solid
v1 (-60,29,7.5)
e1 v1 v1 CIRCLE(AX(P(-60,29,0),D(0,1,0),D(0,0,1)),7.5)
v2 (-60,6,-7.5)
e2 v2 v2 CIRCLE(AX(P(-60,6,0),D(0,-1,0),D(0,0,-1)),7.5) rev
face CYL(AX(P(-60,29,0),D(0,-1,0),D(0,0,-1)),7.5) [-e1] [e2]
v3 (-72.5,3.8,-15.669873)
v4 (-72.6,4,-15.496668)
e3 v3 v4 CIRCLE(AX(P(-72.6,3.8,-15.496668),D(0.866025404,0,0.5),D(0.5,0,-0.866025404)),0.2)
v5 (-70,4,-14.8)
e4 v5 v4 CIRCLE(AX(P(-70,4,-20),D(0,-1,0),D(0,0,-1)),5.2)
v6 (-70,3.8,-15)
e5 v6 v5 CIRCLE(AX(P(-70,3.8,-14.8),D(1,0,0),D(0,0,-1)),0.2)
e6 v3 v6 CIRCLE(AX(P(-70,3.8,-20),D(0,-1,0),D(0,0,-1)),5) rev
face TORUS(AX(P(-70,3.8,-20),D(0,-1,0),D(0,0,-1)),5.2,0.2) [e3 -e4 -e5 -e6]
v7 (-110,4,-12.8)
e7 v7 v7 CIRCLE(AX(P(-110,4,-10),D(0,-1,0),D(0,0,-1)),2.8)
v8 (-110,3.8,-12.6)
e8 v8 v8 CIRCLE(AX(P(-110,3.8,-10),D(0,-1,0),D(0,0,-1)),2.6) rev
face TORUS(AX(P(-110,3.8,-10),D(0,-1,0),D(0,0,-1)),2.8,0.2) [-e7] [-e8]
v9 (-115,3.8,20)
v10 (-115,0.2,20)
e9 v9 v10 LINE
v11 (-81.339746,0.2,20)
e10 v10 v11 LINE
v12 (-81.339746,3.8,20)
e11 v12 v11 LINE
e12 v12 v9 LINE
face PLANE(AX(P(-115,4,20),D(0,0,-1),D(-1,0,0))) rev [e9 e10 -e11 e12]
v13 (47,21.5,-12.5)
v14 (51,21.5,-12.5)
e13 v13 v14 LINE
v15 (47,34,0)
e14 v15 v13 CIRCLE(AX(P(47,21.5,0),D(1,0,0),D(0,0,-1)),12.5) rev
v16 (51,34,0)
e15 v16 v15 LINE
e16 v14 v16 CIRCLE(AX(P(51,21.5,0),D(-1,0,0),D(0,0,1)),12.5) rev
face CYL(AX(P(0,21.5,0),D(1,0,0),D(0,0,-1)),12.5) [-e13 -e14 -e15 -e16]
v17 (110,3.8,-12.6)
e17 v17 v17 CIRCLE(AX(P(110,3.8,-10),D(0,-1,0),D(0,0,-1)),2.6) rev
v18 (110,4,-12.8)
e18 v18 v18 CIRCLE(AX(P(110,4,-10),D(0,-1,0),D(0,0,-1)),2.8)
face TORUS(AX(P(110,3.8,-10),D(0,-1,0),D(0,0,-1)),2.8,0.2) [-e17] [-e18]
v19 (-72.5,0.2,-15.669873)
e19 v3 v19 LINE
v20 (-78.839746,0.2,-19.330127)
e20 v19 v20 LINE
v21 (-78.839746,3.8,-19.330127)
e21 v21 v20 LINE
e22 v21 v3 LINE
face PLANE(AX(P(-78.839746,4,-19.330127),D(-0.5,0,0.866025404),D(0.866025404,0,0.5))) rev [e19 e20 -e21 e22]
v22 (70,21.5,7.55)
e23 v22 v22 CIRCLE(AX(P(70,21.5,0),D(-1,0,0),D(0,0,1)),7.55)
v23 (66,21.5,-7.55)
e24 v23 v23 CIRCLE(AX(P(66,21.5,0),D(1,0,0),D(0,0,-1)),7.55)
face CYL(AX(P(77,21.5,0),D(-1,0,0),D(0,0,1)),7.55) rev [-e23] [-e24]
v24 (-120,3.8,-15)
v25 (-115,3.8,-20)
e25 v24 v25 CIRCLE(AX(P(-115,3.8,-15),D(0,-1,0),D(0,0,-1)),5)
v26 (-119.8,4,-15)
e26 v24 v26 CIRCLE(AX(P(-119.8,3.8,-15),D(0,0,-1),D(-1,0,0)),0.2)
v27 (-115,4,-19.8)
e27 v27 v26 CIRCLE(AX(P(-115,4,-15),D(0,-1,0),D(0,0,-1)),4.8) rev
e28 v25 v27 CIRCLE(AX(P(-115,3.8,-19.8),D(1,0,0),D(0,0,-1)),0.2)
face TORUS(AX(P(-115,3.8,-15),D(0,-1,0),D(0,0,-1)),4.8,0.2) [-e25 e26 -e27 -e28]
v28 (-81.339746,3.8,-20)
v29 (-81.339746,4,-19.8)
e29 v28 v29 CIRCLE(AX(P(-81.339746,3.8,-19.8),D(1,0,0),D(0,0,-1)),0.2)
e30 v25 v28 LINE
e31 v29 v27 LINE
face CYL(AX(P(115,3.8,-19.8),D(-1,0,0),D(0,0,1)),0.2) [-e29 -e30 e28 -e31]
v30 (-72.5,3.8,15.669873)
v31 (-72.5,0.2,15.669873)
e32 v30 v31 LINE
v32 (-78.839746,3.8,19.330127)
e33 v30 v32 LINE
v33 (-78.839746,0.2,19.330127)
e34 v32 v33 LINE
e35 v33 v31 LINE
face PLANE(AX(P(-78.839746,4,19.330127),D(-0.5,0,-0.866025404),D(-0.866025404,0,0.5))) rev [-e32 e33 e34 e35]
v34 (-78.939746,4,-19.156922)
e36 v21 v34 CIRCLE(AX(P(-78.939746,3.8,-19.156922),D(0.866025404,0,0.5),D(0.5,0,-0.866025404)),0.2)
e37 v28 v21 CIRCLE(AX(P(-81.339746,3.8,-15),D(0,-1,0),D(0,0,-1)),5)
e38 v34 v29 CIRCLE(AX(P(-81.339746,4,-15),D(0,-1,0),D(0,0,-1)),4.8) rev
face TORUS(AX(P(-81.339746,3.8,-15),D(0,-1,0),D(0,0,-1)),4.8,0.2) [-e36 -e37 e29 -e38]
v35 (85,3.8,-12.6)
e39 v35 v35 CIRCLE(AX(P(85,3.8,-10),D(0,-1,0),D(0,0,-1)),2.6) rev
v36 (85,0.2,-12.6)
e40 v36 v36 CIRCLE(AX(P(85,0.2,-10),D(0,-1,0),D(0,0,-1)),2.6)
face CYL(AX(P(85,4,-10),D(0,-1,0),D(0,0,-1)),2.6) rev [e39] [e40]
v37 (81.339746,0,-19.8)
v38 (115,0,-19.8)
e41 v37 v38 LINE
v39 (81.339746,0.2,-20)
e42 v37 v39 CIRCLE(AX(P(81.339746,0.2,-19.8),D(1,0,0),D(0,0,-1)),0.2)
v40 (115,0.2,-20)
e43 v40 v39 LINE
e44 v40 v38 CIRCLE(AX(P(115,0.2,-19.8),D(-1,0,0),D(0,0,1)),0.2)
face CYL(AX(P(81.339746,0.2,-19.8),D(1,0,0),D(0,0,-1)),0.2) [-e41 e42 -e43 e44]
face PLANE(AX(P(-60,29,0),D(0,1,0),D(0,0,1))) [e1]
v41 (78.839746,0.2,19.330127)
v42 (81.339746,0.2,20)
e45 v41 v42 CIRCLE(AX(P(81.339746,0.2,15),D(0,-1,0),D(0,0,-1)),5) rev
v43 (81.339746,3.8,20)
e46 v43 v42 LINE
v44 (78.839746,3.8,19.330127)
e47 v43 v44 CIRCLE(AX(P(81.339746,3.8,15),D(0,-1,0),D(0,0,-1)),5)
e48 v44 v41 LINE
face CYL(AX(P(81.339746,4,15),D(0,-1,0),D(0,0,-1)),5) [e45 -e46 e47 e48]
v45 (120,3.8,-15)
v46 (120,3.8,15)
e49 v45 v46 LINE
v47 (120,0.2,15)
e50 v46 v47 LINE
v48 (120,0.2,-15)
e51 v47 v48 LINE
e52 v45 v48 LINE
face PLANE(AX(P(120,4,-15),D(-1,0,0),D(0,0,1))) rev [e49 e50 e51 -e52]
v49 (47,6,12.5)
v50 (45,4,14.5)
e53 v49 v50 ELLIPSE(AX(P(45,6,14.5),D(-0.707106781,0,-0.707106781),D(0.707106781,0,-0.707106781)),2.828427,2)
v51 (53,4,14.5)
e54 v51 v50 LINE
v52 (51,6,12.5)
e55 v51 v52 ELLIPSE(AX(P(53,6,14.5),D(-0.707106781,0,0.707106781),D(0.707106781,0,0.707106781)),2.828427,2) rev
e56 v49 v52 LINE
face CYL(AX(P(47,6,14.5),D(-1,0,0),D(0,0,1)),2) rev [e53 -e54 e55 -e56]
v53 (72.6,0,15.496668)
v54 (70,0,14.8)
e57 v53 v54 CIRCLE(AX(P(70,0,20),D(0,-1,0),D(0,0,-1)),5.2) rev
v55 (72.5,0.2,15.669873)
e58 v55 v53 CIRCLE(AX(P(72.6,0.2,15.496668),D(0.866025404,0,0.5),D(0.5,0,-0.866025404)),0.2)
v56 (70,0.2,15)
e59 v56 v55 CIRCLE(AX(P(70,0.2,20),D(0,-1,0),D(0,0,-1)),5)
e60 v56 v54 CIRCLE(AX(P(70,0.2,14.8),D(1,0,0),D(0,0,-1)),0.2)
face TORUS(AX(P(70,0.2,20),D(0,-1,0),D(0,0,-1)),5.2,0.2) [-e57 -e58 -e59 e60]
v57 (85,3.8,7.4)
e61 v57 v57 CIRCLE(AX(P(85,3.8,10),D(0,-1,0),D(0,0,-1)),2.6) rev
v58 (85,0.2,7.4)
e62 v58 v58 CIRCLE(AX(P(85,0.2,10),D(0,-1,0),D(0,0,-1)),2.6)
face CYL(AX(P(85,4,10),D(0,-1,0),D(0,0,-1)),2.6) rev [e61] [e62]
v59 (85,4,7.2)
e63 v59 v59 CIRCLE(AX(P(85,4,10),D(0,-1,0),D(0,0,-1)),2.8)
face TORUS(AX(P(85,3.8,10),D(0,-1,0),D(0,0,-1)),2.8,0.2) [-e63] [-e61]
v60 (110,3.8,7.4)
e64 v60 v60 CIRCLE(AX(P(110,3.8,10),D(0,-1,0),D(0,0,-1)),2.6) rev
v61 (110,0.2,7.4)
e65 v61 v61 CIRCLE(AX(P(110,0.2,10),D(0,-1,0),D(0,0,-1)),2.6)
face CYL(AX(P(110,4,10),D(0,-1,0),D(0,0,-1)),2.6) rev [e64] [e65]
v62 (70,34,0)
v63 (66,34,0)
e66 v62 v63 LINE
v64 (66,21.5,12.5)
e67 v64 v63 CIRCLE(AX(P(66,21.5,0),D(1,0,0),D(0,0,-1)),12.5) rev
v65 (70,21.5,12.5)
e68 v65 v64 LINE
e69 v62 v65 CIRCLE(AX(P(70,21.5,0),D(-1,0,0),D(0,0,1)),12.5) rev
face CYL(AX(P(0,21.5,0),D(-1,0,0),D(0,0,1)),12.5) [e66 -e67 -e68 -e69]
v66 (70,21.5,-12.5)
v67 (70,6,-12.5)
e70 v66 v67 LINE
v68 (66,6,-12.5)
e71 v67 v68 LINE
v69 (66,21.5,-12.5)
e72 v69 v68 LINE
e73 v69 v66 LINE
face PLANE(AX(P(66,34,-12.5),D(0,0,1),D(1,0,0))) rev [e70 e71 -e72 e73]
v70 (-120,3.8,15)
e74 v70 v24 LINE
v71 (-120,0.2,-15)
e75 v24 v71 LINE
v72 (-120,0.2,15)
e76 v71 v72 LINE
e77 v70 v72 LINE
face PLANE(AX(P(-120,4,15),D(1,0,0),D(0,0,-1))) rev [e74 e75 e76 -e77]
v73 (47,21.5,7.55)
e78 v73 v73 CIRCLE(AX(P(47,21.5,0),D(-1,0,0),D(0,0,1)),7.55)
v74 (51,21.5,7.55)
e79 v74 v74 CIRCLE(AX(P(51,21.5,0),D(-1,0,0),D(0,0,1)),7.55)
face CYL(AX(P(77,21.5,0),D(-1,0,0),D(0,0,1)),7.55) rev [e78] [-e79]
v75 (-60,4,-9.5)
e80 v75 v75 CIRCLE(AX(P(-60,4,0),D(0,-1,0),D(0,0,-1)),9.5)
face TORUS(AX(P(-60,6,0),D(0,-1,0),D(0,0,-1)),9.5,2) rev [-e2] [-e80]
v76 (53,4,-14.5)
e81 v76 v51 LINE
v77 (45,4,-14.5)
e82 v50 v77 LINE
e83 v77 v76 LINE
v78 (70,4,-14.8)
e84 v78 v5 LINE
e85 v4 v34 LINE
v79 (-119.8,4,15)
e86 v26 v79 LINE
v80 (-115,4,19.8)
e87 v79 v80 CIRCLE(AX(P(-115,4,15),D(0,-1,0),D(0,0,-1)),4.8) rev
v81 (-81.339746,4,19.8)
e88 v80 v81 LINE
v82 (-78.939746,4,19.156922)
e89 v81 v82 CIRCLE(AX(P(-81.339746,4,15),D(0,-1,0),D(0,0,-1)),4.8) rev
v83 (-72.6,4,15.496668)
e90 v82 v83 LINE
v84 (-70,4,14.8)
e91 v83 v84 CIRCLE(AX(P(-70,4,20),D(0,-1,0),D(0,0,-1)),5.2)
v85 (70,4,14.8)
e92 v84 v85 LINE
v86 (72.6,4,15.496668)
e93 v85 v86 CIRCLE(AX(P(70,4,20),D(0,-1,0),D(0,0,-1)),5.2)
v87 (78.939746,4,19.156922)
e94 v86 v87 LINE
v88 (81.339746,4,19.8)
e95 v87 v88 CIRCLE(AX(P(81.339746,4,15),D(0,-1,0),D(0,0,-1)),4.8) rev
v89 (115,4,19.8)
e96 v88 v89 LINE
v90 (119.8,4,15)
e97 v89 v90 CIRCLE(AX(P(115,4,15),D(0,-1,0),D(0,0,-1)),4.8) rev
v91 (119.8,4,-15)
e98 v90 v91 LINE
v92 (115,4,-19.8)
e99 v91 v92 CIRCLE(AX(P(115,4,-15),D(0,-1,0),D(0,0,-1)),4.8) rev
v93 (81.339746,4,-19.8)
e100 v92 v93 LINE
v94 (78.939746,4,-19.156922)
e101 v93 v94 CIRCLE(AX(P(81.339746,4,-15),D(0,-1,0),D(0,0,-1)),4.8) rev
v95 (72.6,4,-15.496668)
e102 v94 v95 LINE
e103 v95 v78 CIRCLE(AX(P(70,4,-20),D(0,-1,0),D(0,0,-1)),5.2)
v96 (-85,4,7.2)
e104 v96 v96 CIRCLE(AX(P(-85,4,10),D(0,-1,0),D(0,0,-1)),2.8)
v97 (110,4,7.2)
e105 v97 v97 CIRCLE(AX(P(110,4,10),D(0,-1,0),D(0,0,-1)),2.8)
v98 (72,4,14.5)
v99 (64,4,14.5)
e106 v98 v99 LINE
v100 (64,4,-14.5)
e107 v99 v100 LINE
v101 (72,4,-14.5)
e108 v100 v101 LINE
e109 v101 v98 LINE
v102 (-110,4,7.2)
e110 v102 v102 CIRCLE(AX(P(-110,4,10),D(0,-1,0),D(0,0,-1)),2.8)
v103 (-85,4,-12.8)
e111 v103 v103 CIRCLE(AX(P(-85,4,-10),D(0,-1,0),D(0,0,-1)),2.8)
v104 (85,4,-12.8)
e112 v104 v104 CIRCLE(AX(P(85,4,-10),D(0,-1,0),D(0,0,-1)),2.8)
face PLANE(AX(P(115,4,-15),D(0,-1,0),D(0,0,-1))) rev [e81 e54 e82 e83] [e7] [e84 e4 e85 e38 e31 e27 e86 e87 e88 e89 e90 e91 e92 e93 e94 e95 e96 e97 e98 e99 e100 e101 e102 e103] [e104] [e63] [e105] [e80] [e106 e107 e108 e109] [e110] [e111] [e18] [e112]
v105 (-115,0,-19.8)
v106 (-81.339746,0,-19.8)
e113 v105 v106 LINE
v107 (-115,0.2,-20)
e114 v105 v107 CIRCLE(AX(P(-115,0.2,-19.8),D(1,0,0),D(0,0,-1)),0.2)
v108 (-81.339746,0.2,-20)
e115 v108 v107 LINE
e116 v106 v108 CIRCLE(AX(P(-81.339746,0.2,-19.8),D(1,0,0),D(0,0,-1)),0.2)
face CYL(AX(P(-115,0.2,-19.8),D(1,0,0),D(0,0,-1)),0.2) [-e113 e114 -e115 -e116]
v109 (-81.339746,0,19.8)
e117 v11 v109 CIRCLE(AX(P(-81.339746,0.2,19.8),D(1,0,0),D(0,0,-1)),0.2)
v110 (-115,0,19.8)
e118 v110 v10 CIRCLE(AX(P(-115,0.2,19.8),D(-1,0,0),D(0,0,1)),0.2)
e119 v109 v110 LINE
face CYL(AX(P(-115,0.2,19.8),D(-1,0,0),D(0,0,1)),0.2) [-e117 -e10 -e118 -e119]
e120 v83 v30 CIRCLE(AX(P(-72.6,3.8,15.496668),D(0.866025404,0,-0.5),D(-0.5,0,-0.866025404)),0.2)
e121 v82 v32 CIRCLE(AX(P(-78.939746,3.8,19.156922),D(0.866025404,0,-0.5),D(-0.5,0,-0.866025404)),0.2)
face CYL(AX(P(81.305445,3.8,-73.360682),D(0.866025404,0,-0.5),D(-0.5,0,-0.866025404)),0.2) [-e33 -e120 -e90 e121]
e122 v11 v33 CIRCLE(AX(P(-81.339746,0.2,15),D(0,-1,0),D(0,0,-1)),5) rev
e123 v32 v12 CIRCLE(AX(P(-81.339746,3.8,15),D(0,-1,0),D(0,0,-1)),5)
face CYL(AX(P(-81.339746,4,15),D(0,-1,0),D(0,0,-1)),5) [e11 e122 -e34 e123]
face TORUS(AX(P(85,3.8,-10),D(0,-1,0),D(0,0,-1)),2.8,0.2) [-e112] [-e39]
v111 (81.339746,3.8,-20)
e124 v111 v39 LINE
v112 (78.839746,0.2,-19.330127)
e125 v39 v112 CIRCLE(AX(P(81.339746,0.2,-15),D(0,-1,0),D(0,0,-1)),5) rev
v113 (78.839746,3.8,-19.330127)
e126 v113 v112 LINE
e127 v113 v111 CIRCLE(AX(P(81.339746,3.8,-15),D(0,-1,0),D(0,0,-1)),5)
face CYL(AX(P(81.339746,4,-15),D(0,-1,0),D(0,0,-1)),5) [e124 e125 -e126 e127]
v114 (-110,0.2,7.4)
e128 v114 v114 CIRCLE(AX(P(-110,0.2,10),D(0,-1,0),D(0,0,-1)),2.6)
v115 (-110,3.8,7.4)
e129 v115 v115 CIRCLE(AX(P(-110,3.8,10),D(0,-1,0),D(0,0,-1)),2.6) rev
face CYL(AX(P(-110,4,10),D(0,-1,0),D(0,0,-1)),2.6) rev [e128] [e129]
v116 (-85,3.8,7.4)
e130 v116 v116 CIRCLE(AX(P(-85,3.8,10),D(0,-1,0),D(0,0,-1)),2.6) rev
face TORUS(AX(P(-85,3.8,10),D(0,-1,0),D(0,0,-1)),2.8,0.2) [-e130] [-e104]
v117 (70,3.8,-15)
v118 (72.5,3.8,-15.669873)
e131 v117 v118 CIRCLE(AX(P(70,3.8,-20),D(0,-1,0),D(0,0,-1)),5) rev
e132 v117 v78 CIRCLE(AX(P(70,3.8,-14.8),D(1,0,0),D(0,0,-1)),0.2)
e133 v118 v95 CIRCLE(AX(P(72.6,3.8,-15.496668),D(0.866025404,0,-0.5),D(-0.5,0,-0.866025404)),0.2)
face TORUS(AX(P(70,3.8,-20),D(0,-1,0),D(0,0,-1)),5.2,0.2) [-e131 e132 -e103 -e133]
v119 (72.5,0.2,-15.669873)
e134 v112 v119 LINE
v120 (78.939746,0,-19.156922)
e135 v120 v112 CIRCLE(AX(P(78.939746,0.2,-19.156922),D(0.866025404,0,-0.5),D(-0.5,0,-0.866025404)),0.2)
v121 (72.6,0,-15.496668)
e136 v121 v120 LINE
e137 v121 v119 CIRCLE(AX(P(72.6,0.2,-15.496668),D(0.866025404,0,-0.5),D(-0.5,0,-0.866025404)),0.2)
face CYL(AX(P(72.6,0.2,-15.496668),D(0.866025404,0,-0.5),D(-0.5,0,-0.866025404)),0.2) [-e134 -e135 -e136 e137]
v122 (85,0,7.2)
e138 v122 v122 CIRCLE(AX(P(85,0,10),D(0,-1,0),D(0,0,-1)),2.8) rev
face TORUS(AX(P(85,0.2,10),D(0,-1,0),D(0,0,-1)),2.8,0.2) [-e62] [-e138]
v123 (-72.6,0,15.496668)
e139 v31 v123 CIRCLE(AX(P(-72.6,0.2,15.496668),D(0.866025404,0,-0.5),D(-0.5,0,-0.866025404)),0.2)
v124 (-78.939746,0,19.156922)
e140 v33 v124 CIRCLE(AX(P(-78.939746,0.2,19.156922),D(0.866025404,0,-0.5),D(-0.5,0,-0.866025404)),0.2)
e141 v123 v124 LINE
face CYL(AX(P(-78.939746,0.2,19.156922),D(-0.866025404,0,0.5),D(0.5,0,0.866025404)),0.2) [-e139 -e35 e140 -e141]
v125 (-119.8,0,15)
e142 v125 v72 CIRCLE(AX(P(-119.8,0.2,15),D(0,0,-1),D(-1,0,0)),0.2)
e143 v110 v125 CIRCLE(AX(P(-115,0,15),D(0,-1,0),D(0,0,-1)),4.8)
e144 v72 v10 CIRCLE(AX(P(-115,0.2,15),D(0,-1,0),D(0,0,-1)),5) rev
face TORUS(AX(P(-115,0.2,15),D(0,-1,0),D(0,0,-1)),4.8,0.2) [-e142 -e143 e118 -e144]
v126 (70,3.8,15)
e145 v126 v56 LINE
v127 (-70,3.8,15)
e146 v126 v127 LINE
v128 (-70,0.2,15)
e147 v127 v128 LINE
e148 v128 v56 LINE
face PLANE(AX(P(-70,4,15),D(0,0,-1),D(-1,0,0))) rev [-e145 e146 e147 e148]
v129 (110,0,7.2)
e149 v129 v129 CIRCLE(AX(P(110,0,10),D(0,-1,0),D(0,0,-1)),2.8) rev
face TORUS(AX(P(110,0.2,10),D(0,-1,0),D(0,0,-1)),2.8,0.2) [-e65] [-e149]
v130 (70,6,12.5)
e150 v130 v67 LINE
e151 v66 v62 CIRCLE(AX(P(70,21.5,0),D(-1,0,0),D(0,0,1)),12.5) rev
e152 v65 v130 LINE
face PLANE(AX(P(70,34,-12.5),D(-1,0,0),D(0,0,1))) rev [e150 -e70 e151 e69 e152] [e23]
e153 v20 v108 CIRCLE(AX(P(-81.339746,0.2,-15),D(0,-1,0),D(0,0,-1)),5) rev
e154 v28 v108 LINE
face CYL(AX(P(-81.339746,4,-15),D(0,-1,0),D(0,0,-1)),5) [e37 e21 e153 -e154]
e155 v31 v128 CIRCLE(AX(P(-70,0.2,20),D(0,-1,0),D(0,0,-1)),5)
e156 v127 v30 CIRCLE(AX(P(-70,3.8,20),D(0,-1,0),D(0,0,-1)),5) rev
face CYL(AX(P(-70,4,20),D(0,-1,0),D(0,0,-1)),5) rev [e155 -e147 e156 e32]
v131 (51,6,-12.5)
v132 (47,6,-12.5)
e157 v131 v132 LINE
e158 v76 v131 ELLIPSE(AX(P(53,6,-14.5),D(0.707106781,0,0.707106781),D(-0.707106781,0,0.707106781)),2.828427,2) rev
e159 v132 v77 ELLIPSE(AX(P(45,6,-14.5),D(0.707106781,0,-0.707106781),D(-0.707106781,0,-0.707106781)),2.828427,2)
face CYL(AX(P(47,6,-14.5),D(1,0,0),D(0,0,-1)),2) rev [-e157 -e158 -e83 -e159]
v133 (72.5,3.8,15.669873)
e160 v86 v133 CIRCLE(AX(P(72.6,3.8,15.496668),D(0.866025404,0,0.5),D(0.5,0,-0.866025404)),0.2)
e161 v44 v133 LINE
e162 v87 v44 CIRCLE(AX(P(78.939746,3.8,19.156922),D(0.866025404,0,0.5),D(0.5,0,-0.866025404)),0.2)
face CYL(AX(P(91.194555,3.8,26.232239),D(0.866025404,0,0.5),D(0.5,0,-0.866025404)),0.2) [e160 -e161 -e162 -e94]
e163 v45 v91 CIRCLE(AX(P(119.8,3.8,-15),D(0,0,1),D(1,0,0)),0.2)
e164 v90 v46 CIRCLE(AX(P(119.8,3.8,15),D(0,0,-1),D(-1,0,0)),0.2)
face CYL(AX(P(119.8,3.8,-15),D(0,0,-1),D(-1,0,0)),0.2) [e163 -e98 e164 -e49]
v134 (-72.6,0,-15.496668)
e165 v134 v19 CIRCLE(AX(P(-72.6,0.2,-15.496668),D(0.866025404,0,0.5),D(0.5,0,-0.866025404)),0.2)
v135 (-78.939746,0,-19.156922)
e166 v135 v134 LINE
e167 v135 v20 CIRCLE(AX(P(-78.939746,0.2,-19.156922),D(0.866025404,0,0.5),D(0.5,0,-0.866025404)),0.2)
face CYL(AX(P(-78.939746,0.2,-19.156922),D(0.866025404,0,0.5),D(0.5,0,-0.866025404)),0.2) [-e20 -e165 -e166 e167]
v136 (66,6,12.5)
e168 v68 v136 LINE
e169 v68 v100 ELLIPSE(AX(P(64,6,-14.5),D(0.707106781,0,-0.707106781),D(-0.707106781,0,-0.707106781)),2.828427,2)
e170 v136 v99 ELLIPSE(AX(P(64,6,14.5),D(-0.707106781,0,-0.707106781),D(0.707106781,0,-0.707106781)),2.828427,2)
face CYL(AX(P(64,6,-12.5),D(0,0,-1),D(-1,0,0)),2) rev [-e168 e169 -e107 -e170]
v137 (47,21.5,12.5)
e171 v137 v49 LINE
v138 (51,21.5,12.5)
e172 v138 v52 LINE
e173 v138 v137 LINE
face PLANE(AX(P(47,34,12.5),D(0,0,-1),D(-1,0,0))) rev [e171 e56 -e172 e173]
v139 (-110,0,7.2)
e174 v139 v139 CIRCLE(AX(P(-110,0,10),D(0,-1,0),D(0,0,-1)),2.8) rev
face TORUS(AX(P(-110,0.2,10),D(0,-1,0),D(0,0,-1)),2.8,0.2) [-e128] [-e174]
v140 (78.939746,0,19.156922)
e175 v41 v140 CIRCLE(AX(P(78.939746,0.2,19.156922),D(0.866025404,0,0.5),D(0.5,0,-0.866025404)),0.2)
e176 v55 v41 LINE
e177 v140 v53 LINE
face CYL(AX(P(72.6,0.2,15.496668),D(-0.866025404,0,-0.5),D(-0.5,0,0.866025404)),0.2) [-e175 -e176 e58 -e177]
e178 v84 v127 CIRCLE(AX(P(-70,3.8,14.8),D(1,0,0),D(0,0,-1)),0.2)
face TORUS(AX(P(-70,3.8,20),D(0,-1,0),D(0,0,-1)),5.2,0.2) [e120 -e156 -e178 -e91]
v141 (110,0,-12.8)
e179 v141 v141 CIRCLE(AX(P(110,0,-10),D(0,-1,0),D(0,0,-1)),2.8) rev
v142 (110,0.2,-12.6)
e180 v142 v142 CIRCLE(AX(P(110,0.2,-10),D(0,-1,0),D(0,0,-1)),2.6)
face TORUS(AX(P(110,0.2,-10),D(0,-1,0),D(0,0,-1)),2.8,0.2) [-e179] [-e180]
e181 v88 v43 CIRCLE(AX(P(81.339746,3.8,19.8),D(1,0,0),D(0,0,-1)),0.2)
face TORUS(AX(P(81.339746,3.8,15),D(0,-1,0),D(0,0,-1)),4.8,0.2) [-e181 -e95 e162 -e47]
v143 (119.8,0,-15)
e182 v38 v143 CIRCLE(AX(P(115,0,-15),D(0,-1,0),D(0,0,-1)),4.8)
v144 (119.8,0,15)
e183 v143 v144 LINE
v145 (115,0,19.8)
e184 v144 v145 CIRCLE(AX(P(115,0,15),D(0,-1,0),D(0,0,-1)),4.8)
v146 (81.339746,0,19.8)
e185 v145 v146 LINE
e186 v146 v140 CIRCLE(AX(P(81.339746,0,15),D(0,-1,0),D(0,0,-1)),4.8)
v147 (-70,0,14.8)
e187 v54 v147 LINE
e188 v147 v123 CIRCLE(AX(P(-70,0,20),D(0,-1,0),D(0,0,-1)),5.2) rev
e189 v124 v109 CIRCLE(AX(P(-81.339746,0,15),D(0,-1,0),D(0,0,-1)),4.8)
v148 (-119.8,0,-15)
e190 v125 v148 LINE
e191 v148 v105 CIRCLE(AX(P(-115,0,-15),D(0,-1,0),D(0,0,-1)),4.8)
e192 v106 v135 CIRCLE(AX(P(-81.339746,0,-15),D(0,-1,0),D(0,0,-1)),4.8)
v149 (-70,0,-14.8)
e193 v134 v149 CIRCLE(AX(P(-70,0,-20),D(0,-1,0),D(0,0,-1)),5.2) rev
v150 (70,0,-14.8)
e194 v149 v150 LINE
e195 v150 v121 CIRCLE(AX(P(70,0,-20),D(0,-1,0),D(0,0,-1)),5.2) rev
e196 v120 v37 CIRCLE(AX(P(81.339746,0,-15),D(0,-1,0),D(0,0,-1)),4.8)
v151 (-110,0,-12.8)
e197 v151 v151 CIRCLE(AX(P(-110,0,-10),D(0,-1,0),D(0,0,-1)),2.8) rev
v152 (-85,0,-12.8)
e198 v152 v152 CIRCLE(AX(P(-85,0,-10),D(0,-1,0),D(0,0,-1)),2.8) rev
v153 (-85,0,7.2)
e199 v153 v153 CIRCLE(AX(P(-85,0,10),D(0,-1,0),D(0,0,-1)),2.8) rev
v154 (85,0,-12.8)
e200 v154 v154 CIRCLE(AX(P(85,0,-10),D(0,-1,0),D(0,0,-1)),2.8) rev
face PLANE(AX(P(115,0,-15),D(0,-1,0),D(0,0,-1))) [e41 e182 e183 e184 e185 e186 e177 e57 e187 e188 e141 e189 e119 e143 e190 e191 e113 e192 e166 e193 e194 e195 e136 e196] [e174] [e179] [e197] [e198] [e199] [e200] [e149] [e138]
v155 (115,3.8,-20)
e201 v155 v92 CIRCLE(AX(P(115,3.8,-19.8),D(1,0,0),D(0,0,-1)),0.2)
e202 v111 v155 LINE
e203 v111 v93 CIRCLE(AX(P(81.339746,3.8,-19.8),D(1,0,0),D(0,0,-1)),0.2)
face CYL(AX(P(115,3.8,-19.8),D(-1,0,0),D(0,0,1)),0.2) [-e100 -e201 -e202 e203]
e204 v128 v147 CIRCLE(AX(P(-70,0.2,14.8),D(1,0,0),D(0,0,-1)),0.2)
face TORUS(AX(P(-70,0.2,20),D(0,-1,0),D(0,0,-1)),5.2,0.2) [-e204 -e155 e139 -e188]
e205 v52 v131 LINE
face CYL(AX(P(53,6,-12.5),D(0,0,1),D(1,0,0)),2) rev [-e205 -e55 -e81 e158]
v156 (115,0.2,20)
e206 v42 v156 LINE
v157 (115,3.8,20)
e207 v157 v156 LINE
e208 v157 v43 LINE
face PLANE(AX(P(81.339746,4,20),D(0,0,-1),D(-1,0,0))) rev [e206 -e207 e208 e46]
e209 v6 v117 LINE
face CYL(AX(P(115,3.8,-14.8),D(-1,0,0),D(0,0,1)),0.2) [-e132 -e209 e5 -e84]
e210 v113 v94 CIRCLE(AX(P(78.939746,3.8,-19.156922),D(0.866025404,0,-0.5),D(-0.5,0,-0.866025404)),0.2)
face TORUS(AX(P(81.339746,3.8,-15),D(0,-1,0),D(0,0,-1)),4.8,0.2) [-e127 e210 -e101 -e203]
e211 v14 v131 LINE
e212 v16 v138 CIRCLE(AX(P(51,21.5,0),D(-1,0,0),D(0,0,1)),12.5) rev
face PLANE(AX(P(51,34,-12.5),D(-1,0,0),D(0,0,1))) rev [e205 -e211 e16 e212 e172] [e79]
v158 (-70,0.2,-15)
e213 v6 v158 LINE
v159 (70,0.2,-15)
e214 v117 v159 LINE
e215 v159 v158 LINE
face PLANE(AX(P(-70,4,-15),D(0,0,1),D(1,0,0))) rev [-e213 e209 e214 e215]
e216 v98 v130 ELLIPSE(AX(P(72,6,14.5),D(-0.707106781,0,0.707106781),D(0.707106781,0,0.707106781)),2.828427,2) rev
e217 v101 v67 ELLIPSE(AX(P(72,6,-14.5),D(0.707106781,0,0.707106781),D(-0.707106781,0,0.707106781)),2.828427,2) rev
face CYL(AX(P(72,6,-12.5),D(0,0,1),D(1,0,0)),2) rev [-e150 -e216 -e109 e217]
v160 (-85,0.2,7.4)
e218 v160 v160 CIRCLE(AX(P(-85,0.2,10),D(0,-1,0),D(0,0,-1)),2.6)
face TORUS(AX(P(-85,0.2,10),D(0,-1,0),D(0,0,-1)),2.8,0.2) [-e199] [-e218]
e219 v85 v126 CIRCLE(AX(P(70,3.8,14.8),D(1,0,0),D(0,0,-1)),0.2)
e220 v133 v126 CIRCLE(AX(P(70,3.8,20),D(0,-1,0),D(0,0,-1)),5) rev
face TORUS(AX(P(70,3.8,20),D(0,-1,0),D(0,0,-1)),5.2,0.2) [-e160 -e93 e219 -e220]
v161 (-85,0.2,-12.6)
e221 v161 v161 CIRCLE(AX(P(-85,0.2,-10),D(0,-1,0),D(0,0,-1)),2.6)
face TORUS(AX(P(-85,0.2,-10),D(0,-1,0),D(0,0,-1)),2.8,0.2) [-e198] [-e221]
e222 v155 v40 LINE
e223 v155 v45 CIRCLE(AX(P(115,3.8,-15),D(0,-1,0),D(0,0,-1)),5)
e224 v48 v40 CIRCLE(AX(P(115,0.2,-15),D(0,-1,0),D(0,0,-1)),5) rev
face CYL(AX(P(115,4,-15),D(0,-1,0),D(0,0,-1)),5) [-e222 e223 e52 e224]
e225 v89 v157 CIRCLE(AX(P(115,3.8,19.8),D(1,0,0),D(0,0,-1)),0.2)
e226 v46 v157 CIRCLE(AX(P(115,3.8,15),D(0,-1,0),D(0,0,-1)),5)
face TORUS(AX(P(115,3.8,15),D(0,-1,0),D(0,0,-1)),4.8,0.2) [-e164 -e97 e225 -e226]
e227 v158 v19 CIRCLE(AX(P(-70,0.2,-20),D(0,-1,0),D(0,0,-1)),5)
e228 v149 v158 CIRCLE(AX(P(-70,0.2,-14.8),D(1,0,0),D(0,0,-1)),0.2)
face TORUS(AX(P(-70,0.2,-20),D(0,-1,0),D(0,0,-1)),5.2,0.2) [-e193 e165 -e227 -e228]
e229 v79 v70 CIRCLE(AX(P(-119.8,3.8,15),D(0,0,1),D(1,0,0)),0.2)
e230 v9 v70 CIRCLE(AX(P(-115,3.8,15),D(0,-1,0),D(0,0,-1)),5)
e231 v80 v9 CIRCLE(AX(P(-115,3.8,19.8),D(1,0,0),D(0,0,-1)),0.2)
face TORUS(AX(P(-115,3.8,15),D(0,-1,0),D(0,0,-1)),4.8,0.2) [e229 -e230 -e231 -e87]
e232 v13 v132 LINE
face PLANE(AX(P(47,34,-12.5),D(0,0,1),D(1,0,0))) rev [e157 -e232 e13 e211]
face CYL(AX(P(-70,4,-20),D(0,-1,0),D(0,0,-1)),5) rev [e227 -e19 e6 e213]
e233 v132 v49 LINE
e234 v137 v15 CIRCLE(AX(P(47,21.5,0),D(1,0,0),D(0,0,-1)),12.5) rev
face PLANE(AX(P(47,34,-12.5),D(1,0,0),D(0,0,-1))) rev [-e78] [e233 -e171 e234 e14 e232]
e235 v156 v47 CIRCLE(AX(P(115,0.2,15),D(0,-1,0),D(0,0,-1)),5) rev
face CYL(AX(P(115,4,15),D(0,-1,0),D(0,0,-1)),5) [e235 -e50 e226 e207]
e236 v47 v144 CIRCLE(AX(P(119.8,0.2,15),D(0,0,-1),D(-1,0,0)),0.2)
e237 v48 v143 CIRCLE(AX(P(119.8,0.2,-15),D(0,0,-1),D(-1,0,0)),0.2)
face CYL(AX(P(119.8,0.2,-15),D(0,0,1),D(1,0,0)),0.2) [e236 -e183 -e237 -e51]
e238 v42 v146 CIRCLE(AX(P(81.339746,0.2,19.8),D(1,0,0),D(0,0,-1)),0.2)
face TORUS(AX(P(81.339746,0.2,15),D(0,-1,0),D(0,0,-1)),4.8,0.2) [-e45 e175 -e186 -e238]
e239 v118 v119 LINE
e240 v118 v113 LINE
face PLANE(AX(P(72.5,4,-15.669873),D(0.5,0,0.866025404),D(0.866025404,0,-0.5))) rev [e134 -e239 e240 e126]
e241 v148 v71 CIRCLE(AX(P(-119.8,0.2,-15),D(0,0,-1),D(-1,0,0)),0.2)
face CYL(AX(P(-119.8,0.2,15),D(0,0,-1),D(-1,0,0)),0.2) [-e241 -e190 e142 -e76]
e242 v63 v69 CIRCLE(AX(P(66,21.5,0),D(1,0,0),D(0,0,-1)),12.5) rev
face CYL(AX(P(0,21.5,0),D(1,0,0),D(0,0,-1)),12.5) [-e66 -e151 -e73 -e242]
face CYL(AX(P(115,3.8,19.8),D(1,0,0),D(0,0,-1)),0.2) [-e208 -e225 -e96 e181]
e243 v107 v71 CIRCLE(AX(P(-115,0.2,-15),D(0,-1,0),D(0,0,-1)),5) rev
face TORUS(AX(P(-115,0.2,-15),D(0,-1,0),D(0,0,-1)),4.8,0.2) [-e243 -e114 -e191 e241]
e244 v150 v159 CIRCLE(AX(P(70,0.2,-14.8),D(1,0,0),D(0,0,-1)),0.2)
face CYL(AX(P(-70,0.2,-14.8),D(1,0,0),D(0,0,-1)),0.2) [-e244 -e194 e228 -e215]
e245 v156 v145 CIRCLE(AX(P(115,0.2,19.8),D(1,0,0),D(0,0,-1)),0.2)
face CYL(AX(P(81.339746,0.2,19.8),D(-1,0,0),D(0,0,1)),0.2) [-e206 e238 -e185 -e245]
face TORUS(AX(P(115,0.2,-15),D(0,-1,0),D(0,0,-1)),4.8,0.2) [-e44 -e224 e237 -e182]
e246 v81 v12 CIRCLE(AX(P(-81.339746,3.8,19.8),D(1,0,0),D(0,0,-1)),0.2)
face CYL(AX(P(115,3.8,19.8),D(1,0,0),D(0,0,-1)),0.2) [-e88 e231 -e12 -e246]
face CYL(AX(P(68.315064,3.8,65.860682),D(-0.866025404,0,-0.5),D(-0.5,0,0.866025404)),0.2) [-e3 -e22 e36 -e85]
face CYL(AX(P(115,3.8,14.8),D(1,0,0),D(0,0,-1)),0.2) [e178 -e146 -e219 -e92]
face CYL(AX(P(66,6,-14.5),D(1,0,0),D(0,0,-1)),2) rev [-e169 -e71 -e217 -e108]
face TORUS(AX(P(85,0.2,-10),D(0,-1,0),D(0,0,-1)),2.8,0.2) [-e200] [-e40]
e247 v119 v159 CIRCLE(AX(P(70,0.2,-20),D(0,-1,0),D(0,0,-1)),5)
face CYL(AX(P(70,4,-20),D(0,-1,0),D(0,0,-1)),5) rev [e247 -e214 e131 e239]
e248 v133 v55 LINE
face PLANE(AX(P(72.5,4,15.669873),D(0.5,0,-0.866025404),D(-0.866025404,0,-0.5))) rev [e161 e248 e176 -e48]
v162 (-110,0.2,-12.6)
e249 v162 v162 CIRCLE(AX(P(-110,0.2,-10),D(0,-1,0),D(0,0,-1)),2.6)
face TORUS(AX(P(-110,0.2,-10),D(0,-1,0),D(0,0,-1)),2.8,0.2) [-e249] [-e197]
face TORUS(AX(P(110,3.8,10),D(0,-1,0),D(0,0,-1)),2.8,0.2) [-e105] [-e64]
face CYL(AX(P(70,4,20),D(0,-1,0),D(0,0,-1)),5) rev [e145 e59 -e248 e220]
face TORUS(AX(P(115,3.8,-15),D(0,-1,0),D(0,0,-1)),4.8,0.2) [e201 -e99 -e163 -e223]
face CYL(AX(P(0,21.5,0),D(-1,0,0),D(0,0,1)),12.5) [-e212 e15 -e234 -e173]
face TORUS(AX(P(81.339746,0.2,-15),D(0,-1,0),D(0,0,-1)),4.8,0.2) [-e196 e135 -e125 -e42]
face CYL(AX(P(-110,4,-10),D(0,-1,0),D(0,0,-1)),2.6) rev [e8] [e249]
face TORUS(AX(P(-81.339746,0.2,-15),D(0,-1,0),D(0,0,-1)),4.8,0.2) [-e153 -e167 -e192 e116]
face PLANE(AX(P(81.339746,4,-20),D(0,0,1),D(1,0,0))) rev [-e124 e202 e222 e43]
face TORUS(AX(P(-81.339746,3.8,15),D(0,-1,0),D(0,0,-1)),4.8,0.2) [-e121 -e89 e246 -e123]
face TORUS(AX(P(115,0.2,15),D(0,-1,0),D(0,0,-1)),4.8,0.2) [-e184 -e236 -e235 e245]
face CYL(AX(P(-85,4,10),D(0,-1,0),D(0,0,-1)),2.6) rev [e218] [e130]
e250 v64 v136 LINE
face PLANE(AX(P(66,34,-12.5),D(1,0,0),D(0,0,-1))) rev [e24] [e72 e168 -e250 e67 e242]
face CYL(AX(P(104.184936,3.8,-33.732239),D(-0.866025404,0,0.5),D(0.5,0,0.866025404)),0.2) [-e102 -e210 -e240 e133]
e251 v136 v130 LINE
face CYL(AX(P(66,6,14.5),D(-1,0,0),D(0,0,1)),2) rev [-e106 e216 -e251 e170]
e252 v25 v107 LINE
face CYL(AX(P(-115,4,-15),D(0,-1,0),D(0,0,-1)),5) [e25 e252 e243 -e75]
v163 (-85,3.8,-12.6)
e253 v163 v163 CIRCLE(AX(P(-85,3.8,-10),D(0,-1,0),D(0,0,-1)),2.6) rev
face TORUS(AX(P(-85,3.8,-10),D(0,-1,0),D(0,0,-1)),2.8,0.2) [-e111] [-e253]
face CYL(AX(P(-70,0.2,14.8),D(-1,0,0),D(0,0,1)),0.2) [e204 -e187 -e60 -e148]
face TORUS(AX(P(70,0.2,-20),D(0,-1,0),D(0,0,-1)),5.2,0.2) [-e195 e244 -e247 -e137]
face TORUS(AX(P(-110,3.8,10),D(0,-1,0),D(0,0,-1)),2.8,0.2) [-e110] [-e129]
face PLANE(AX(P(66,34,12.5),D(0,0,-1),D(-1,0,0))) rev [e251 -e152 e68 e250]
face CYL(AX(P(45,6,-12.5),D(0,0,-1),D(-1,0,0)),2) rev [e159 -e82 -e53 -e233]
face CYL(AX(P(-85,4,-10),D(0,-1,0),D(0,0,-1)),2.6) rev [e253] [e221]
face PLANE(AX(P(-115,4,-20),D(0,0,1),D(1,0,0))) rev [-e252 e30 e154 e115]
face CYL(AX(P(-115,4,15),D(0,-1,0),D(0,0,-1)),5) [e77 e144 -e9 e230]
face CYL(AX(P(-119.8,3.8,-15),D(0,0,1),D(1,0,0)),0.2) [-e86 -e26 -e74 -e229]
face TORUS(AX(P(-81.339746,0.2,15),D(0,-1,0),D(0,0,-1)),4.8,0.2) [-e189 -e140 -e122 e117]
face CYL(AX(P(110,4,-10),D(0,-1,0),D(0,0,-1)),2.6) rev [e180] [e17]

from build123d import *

# Parameters (mm, degrees)
SKETCH1_R           = 2.6
BOSS_EXTRUDE1_DEPTH = 4
SKETCH2_W           = 4
SKETCH2_H           = 25
BOSS_EXTRUDE2_DEPTH = 30
FILLET2_R           = 12.5
SKETCH4_R           = 7.55
CUT_EXTRUDE1_DEPTH  = 30
SKETCH5_R           = 7.5
BOSS_EXTRUDE3_DEPTH = 25
FILLET3_R           = 2
FILLET6_R           = 0.2


with BuildPart() as part:
    # Sketch1 → Boss-Extrude1 (new body)
    with BuildSketch(Plane(origin=(0, 0, 0), x_dir=(1, 0, 0), z_dir=(0, 1, 0))):
        with BuildLine():
            Line((-120, -15), (-120, 15))
            ThreePointArc((-120, 15), (-118.535533906, 18.535533906), (-115, 20))
            Line((-115, 20), (-81.339745962, 20))
            ThreePointArc((-81.339745962, 20), (-80.045650737, 19.829629131), (-78.839745962, 19.330127019))
            Line((-78.839745962, 19.330127019), (-72.5, 15.669872981))
            ThreePointArc((-72.5, 15.669872981), (-71.294095226, 15.170370869), (-70, 15))
            Line((-70, 15), (70, 15))
            ThreePointArc((70, 15), (71.294095226, 15.170370869), (72.5, 15.669872981))
            Line((72.5, 15.669872981), (78.839745962, 19.330127019))
            ThreePointArc((78.839745962, 19.330127019), (80.045650737, 19.829629131), (81.339745962, 20))
            Line((81.339745962, 20), (115, 20))
            ThreePointArc((115, 20), (118.535533906, 18.535533906), (120, 15))
            Line((120, 15), (120, -15))
            ThreePointArc((120, -15), (118.535533906, -18.535533906), (115, -20))
            Line((115, -20), (81.339745962, -20))
            ThreePointArc((81.339745962, -20), (80.045650737, -19.829629131), (78.839745962, -19.330127019))
            Line((78.839745962, -19.330127019), (72.5, -15.669872981))
            ThreePointArc((72.5, -15.669872981), (71.294095226, -15.170370869), (70, -15))
            Line((70, -15), (-70, -15))
            ThreePointArc((-70, -15), (-71.294095226, -15.170370869), (-72.5, -15.669872981))
            Line((-72.5, -15.669872981), (-78.839745962, -19.330127019))
            ThreePointArc((-78.839745962, -19.330127019), (-80.045650737, -19.829629131), (-81.339745962, -20))
            Line((-81.339745962, -20), (-115, -20))
            ThreePointArc((-115, -20), (-118.535533906, -18.535533906), (-120, -15))
        make_face()
        with Locations(Location((-110, 10, 0), (0, 0, 270))):
            Circle(SKETCH1_R, mode=Mode.SUBTRACT)
        with Locations(Location((-85, 10, 0), (0, 0, 270))):
            Circle(SKETCH1_R, mode=Mode.SUBTRACT)
        with Locations(Location((-85, -10, 0), (0, 0, 270))):
            Circle(SKETCH1_R, mode=Mode.SUBTRACT)
        with Locations(Location((-110, -10, 0), (0, 0, 270))):
            Circle(SKETCH1_R, mode=Mode.SUBTRACT)
        with Locations(Location((85, -10, 0), (0, 0, 90))):
            Circle(SKETCH1_R, mode=Mode.SUBTRACT)
        with Locations(Location((110, -10, 0), (0, 0, 90))):
            Circle(SKETCH1_R, mode=Mode.SUBTRACT)
        with Locations(Location((85, 10, 0), (0, 0, 90))):
            Circle(SKETCH1_R, mode=Mode.SUBTRACT)
        with Locations(Location((110, 10, 0), (0, 0, 90))):
            Circle(SKETCH1_R, mode=Mode.SUBTRACT)
    extrude(amount=BOSS_EXTRUDE1_DEPTH)

    # Sketch2 → Boss-Extrude2 (add)
    with BuildSketch(Plane(origin=(0, 4, 0), x_dir=(1, 0, 0), z_dir=(0, 1, 0))):
        with Locations((49, 0)):
            Rectangle(SKETCH2_W, SKETCH2_H)
        with Locations((68, 0)):
            Rectangle(SKETCH2_W, SKETCH2_H)
    extrude(amount=BOSS_EXTRUDE2_DEPTH)

    # Fillet2
    fillet2_edges = [part.edges().sort_by_distance(p)[0] for p in [
        (49, 34, 12.5),
        (68, 34, 12.5),
        (68, 34, -12.5),
        (49, 34, -12.5),
    ]]
    fillet(fillet2_edges, radius=FILLET2_R - 0.0001)  # a hair under: the kernel refuses the full size

    # Sketch4 → Cut-Extrude1 (cut)
    with BuildSketch(Plane.ZY.offset(-47)):
        with Locations((0, 21.5)):
            Circle(SKETCH4_R)
    extrude(amount=-CUT_EXTRUDE1_DEPTH, mode=Mode.SUBTRACT)

    # Sketch5 → Boss-Extrude3 (add)
    with BuildSketch(Plane(origin=(0, 4, 0), x_dir=(1, 0, 0), z_dir=(0, 1, 0))):
        with Locations(Location((-60, 0, 0), (0, 0, 90))):
            Circle(SKETCH5_R)
    extrude(amount=BOSS_EXTRUDE3_DEPTH)

    # Fillet3
    fillet3_edges = [part.edges().sort_by_distance(p)[0] for p in [
        (51, 4, 0),
        (49, 4, -12.5),
        (47, 4, 0),
        (49, 4, 12.5),
        (70, 4, 0),
        (68, 4, -12.5),
        (66, 4, 0),
        (68, 4, 12.5),
        (-60, 4, 7.5),
    ]]
    fillet(fillet3_edges, radius=FILLET3_R)

    # Fillet6
    fillet6_edges = [part.edges().sort_by_distance(p)[0] for p in [
        (80.045650737, 4, -19.829629131),
        (75.669872981, 4, -17.5),
        (71.294095226, 4, -15.170370869),
        (120, 0, 0),
        (118.535533906, 0, 18.535533906),
        (98.169872981, 0, 20),
        (80.045650737, 0, 19.829629131),
        (75.669872981, 0, 17.5),
        (0, 4, -15),
        (71.294095226, 0, 15.170370869),
        (0, 0, 15),
        (-71.294095226, 0, 15.170370869),
        (-75.669872981, 0, 17.5),
        (-80.045650737, 0, 19.829629131),
        (-98.169872981, 0, 20),
        (-118.535533906, 0, 18.535533906),
        (-120, 0, 0),
        (-118.535533906, 0, -18.535533906),
        (-98.169872981, 0, -20),
        (-71.294095226, 4, -15.170370869),
        (-80.045650737, 0, -19.829629131),
        (-75.669872981, 0, -17.5),
        (-71.294095226, 0, -15.170370869),
        (0, 0, -15),
        (71.294095226, 0, -15.170370869),
        (75.669872981, 0, -17.5),
        (80.045650737, 0, -19.829629131),
        (98.169872981, 0, -20),
        (118.535533906, 0, -18.535533906),
        (-75.669872981, 4, -17.5),
        (-80.045650737, 4, -19.829629131),
        (-98.169872981, 4, -20),
        (-118.535533906, 4, -18.535533906),
        (-120, 4, 0),
        (118.535533906, 4, -18.535533906),
        (-118.535533906, 4, 18.535533906),
        (-98.169872981, 4, 20),
        (-110, 0, -12.6),
        (-110, 4, -12.6),
        (-80.045650737, 4, 19.829629131),
        (-85, 0, -12.6),
        (-85, 4, -12.6),
        (-75.669872981, 4, 17.5),
        (-85, 0, 7.4),
        (-85, 4, 7.4),
        (-71.294095226, 4, 15.170370869),
        (-110, 0, 7.4),
        (-110, 4, 7.4),
        (0, 4, 15),
        (85, 0, 12.6),
        (85, 4, 12.6),
        (71.294095226, 4, 15.170370869),
        (110, 0, 12.6),
        (110, 4, 12.6),
        (75.669872981, 4, 17.5),
        (85, 0, -7.4),
        (85, 4, -7.4),
        (80.045650737, 4, 19.829629131),
        (110, 0, -7.4),
        (110, 4, -7.4),
        (98.169872981, 4, 20),
        (98.169872981, 4, -20),
        (118.535533906, 4, 18.535533906),
        (120, 4, 0),
    ]]
    fillet(fillet6_edges, radius=FILLET6_R)


solid = part.part
